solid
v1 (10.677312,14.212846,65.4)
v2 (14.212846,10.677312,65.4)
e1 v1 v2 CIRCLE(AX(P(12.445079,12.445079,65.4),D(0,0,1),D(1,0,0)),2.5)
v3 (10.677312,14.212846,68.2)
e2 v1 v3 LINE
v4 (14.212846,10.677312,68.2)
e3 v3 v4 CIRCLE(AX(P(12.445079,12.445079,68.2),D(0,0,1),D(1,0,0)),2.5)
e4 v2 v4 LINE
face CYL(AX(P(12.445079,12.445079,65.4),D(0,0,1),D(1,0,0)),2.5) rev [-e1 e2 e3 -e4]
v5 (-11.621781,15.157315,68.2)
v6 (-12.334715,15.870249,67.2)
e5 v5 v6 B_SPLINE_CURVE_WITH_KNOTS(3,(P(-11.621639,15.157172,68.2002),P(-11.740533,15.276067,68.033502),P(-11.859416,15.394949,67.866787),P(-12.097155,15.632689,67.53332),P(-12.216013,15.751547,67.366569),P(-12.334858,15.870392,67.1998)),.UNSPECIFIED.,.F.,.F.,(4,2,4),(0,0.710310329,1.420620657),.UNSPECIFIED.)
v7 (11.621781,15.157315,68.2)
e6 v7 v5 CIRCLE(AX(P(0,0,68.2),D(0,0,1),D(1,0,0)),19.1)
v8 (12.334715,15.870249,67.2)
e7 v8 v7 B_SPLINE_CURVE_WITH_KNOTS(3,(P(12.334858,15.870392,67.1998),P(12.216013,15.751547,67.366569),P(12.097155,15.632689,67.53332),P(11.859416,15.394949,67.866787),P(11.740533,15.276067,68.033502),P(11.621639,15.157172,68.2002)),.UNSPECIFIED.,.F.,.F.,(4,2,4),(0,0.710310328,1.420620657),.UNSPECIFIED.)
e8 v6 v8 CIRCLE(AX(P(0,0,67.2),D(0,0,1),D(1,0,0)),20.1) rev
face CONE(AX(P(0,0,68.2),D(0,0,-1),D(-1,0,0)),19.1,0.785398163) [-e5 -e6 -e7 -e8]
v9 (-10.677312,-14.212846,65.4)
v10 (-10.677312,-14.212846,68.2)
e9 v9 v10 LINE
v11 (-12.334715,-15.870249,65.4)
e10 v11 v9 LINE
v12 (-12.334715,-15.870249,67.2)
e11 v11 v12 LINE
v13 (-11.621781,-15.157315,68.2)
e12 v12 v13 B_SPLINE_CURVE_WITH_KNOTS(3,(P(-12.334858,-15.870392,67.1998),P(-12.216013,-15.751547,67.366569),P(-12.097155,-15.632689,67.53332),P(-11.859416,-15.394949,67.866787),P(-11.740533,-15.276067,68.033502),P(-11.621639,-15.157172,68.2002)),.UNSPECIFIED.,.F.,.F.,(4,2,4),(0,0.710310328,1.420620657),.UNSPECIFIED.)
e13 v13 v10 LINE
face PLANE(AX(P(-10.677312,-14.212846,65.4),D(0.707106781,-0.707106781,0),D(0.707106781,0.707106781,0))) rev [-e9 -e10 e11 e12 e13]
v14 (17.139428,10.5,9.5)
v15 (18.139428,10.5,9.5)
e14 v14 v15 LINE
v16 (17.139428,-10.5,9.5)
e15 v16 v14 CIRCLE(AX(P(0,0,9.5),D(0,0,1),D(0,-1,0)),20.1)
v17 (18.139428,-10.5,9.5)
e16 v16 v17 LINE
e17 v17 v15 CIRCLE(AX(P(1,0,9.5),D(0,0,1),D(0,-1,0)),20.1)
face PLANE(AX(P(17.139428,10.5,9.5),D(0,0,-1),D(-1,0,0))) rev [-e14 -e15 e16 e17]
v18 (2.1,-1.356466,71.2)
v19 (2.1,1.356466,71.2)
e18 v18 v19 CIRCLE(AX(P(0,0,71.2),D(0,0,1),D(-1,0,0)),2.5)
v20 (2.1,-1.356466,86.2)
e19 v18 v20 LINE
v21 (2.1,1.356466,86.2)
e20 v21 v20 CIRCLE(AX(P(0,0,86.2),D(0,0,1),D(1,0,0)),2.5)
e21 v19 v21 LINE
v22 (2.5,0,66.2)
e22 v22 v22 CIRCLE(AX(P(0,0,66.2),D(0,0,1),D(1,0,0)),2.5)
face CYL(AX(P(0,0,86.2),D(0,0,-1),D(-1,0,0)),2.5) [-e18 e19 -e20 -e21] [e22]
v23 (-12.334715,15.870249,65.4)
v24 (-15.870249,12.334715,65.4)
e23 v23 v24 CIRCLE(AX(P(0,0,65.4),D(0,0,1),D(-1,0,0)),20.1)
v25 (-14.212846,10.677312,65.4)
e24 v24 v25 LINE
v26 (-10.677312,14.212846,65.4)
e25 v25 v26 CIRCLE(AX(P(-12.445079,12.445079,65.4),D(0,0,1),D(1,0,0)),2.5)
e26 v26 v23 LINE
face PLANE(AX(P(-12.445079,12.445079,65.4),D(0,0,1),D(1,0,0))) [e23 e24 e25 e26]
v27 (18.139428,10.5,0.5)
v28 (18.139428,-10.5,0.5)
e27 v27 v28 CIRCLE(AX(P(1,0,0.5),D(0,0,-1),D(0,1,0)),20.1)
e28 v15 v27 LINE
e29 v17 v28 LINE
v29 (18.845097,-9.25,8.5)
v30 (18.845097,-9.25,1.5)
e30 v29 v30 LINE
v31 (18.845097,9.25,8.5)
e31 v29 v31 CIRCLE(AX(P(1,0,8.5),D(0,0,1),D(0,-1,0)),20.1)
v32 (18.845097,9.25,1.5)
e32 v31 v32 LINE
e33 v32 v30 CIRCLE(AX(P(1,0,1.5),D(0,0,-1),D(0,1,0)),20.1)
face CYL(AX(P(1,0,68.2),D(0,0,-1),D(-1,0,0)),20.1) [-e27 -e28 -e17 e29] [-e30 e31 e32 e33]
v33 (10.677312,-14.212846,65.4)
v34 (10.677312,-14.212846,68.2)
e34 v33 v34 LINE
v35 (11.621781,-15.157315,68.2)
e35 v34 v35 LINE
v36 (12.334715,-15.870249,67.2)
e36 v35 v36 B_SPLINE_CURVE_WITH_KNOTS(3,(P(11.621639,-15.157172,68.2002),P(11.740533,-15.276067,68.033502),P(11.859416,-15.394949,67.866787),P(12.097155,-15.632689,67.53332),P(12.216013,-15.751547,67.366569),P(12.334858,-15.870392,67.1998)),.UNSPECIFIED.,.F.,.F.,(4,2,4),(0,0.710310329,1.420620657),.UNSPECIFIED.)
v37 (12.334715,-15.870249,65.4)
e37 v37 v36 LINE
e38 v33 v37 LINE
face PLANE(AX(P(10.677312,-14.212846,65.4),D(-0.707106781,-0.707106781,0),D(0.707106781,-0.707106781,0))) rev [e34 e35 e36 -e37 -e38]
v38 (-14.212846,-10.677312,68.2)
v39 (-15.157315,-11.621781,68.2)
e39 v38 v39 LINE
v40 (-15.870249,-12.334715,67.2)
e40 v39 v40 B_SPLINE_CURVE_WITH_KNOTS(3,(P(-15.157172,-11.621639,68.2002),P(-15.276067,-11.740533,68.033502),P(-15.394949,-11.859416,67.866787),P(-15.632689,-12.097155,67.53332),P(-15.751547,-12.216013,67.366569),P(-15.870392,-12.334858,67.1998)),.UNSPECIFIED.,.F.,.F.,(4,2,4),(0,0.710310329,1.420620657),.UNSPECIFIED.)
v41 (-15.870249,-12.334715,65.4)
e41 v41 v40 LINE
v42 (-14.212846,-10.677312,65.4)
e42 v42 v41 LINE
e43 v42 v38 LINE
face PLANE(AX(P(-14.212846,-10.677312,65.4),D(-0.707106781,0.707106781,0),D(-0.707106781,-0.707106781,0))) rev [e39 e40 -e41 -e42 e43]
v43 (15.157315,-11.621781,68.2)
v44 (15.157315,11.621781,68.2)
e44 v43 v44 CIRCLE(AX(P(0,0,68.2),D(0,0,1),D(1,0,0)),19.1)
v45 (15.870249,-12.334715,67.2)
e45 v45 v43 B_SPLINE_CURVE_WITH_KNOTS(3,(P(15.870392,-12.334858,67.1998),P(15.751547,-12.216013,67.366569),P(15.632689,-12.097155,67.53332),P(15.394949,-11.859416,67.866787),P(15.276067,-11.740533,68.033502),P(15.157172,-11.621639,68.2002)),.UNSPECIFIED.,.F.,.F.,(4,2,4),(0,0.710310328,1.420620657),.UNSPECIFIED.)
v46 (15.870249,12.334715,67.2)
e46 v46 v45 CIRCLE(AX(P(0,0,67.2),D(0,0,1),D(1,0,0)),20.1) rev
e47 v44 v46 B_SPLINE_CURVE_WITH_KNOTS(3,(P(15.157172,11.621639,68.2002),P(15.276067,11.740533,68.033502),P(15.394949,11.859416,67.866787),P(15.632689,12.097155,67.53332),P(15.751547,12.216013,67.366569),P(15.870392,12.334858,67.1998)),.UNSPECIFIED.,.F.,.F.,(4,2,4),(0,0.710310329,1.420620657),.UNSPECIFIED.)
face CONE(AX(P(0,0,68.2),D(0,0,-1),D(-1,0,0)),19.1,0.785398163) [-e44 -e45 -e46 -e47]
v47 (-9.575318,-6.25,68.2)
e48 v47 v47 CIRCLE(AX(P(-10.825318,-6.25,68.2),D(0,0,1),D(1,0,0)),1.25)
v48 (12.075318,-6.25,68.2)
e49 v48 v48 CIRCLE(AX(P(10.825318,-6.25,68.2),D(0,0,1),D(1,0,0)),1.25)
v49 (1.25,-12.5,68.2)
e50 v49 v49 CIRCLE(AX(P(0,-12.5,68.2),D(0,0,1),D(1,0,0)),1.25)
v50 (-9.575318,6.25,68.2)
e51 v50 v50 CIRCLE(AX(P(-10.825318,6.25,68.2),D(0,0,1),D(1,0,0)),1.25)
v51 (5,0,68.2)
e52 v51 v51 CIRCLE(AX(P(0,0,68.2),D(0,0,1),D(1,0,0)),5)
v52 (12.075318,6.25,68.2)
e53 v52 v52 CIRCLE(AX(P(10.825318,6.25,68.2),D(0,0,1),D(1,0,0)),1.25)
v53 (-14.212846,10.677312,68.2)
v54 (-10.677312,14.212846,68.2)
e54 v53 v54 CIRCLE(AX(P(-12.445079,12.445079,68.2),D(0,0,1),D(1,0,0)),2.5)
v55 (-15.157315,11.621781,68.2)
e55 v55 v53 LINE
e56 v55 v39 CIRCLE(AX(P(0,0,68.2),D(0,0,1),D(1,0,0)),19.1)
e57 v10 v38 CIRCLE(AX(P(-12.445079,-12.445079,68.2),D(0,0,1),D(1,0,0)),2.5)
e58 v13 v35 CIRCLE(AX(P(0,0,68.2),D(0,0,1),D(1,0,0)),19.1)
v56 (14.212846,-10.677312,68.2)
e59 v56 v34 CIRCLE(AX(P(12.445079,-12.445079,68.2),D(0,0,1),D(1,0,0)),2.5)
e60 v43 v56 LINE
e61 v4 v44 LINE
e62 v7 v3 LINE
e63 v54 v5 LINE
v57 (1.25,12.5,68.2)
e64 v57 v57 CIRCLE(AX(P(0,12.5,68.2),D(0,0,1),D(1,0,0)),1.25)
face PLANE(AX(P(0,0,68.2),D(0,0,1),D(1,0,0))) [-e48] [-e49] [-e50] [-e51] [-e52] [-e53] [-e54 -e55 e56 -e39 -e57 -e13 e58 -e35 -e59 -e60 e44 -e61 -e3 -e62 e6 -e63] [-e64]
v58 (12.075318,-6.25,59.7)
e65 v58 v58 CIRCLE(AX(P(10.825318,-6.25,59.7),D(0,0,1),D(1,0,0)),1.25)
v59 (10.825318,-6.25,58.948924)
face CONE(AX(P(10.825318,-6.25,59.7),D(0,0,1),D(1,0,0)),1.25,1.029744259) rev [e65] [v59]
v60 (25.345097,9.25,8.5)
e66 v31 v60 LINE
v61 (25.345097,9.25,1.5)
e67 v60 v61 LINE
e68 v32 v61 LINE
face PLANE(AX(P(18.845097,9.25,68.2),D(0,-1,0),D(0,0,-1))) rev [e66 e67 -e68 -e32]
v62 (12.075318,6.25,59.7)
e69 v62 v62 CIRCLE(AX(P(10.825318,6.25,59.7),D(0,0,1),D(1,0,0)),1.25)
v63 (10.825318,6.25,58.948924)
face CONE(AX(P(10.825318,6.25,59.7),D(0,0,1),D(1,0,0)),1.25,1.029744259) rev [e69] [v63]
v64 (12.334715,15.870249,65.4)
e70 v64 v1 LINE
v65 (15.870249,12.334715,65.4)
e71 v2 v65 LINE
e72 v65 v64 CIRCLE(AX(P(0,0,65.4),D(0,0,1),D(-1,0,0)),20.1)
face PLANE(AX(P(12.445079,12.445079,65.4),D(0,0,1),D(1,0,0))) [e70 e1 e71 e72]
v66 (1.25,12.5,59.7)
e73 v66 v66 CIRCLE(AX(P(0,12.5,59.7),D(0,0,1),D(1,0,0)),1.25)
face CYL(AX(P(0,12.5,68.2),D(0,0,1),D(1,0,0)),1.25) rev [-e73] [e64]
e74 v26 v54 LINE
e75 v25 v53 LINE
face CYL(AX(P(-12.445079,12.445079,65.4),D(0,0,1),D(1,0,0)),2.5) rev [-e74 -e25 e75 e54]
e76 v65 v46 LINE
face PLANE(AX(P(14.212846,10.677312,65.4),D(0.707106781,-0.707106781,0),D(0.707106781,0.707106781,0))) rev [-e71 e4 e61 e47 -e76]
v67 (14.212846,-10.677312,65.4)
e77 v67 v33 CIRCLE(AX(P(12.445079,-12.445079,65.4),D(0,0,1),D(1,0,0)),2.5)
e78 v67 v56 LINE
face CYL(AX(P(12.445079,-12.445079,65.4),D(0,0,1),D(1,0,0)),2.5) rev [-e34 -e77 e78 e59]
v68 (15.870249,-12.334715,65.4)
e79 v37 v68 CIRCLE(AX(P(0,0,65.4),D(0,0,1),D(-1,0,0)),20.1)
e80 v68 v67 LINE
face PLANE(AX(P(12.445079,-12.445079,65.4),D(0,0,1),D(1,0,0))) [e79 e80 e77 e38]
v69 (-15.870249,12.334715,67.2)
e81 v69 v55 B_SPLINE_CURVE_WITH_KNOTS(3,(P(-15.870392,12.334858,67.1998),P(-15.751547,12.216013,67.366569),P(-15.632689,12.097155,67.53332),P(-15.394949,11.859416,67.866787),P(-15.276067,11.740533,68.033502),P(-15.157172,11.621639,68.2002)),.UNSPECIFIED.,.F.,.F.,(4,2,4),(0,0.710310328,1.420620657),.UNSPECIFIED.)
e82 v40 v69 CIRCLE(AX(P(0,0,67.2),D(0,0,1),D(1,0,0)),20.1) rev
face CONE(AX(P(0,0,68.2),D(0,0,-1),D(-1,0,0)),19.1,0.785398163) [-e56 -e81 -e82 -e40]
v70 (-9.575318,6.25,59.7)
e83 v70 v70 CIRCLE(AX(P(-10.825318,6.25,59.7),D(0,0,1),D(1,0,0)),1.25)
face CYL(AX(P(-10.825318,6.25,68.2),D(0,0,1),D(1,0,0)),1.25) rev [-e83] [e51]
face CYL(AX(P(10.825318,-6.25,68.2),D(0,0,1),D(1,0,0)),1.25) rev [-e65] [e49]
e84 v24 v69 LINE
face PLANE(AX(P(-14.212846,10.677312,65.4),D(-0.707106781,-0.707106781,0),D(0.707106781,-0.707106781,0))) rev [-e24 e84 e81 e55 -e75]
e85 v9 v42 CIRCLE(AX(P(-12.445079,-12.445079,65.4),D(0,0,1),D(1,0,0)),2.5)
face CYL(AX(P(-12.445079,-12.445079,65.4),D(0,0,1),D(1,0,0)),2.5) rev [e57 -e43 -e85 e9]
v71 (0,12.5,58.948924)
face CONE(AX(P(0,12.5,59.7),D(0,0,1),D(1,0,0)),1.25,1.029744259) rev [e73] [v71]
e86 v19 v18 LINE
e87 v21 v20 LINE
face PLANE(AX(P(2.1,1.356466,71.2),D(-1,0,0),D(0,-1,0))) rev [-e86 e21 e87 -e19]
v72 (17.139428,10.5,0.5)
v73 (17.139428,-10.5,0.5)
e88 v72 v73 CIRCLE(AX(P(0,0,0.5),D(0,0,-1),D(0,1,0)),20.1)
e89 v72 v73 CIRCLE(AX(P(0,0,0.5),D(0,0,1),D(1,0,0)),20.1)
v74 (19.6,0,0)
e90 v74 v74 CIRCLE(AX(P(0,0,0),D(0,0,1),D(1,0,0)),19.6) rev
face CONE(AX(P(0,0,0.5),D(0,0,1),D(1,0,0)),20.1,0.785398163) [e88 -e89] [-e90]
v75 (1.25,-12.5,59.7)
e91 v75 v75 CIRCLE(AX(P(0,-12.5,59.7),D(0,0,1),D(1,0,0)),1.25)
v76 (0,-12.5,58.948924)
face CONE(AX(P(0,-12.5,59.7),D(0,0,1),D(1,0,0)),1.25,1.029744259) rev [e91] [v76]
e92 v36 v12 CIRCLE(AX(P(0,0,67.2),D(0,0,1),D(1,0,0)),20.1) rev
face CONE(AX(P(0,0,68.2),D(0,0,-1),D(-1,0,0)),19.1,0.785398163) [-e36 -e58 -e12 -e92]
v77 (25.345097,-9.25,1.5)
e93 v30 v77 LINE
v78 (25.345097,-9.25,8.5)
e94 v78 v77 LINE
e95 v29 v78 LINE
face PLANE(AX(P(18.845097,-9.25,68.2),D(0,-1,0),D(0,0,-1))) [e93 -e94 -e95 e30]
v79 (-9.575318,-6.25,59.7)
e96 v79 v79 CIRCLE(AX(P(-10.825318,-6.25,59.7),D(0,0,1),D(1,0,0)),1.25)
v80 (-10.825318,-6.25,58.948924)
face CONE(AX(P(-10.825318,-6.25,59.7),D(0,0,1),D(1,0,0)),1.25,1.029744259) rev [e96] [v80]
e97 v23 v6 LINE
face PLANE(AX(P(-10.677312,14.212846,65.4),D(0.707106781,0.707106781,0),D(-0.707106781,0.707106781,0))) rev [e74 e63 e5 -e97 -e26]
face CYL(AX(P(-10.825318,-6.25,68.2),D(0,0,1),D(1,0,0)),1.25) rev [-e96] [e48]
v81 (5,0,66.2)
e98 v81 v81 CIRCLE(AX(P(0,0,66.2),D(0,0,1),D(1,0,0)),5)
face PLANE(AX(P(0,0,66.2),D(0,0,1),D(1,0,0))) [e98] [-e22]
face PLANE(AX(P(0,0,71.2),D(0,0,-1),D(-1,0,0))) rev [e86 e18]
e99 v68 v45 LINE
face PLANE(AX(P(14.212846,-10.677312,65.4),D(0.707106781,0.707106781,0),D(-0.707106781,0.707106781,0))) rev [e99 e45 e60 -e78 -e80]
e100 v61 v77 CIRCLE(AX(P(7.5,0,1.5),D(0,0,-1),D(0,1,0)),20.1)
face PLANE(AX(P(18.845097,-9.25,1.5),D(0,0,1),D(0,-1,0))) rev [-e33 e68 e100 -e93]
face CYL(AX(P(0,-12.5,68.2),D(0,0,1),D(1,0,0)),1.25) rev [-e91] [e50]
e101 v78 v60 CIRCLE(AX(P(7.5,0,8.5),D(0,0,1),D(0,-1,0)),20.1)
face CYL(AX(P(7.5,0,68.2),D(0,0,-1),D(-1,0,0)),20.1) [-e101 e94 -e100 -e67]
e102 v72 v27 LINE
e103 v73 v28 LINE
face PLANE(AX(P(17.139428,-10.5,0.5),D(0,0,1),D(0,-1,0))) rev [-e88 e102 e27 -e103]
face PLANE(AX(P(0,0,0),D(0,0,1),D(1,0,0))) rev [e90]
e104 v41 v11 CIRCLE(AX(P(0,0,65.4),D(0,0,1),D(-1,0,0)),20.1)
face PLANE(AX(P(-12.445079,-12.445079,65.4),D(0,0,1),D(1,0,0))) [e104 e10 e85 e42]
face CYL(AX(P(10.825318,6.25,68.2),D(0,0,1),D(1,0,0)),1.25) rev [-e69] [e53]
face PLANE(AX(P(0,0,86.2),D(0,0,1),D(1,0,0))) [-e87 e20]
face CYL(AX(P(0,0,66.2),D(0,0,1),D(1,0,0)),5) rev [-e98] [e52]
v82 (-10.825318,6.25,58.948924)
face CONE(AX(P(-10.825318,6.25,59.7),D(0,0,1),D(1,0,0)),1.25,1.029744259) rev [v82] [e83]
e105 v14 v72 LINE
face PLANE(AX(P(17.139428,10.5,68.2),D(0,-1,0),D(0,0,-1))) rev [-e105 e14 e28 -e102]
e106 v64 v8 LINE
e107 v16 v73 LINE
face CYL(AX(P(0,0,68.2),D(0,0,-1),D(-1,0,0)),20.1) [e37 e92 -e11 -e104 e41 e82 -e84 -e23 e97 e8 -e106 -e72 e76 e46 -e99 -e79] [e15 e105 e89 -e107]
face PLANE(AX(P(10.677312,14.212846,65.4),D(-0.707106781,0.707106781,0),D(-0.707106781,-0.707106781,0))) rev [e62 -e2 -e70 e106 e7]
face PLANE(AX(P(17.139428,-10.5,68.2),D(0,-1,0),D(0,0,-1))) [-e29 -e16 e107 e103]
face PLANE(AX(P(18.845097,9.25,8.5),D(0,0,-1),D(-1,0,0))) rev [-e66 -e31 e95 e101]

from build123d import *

# Parameters (mm, degrees)
SKETCH_1_R             = 20.1
EXTRUDE_1_DEPTH        = 68.2
SKETCH_2_R             = 5
CUT_EXTRUDE_1_DEPTH    = 2
SKETCH_3_R             = 2.5
EXTRUDE_2_DEPTH        = 20
CUT_EXTRUDE_START      = -15
CUT_EXTRUDE_2_DEPTH    = 15
CHAMFER_1_SIZE         = 1
M3X0_51_D              = 2.5
M3X0_51_DEPTH          = 8.5
M3X0_51_TIP            = 0.751075774
CUT_EXTRUDE_START_2    = -2.8
CUT_EXTRUDE_3_DEPTH    = 2.8
CHAMFER_2_SIZE         = 0.5
EXTRUDE_5_REACH        = 104.708
EXTRUDE_5_START_RADIUS = 20.1
EXTRUDE_5_END_RADIUS   = 20.1
SKETCH_9_W             = 9
SKETCH_9_H             = 21
EXTRUDE_6_REACH        = 110.208
EXTRUDE_6_START_RADIUS = 20.1
EXTRUDE_6_END_RADIUS   = 20.1
SKETCH_10_W            = 7
SKETCH_10_H            = 18.5


with BuildPart() as part:
    # Эскиз1 → Бобышка-Вытянуть1 (new body)
    with BuildSketch(Plane.XY):
        Circle(SKETCH_1_R)
    extrude(amount=EXTRUDE_1_DEPTH)

    # Эскиз2 → Вырез-Вытянуть1 (cut)
    with BuildSketch(Plane.XY.offset(68.2)):
        Circle(SKETCH_2_R)
    extrude(amount=-CUT_EXTRUDE_1_DEPTH, mode=Mode.SUBTRACT)

    # Эскиз3 → Бобышка-Вытянуть2 (add)
    with BuildSketch(Plane.XY.offset(66.2)):
        Circle(SKETCH_3_R)
    extrude(amount=EXTRUDE_2_DEPTH)

    # Эскиз4 → Вырез-Вытянуть2 (cut)
    with BuildSketch(Plane.XY.offset(86.2).offset(CUT_EXTRUDE_START)):
        with BuildLine():
            Line((2.1, 1.356465997), (2.1, -1.356465997))
            ThreePointArc((2.1, -1.356465997), (2.5, 0), (2.1, 1.356465997))
        make_face()
    extrude(amount=CUT_EXTRUDE_2_DEPTH, mode=Mode.SUBTRACT)

    # Фаска1
    chamfer_1_edges = [part.edges().sort_by_distance(p)[0] for p in [
        (-20.1, 0, 68.2),
    ]]
    chamfer(chamfer_1_edges, length=CHAMFER_1_SIZE)

    # Отверстие обработанное метчиком M3x0.51
    with Locations(Plane.XY.offset(68.2)):
        with Locations((-10.825317547, 6.25), (0, 12.5), (10.825317547, 6.25), (10.825317547, -6.25), (0, -12.5), (-10.825317547, -6.25)):
            Hole(M3X0_51_D / 2, depth=M3X0_51_DEPTH)
            with Locations((0, 0, -(M3X0_51_DEPTH + M3X0_51_TIP / 2))):  # 118° drill point
                Cone(0, M3X0_51_D / 2, M3X0_51_TIP, mode=Mode.SUBTRACT)

    # Эскиз8 → Вырез-Вытянуть3 (cut)
    with BuildSketch(Plane.XY.offset(68.2).offset(CUT_EXTRUDE_START_2)):
        with BuildLine():
            Line((-14.212846302, 10.677312396), (-15.870249004, 12.334715098))
            ThreePointArc((-15.870249004, 12.334715098), (-14.212846302, 14.212846302), (-12.334715098, 15.870249004))
            Line((-12.334715098, 15.870249004), (-10.677312396, 14.212846302))
            ThreePointArc((-10.677312396, 14.212846302), (-10.677312396, 10.677312396), (-14.212846302, 10.677312396))
        make_face()
        with BuildLine():
            Line((14.212846302, 10.677312396), (15.870249004, 12.334715098))
            ThreePointArc((15.870249004, 12.334715098), (14.212846302, 14.212846302), (12.334715098, 15.870249004))
            Line((12.334715098, 15.870249004), (10.677312396, 14.212846302))
            ThreePointArc((10.677312396, 14.212846302), (10.677312396, 10.677312396), (14.212846302, 10.677312396))
        make_face()
        with BuildLine():
            Line((10.677312396, -14.212846302), (12.334715098, -15.870249004))
            ThreePointArc((12.334715098, -15.870249004), (14.212846302, -14.212846302), (15.870249004, -12.334715098))
            Line((15.870249004, -12.334715098), (14.212846302, -10.677312396))
            ThreePointArc((14.212846302, -10.677312396), (10.677312396, -10.677312396), (10.677312396, -14.212846302))
        make_face()
        with BuildLine():
            Line((-14.212846302, -10.677312396), (-15.870249004, -12.334715098))
            ThreePointArc((-15.870249004, -12.334715098), (-14.212846302, -14.212846302), (-12.334715098, -15.870249004))
            Line((-12.334715098, -15.870249004), (-10.677312396, -14.212846302))
            ThreePointArc((-10.677312396, -14.212846302), (-10.677312396, -10.677312396), (-14.212846302, -10.677312396))
        make_face()
    extrude(amount=CUT_EXTRUDE_3_DEPTH, mode=Mode.SUBTRACT)

    # Фаска2
    chamfer_2_edges = [part.edges().sort_by_distance(p)[0] for p in [
        (-20.1, 0, 0),
    ]]
    chamfer(chamfer_2_edges, length=CHAMFER_2_SIZE)

    # Бобышка-Вытянуть5: from a cylinder face, 104.708 long prism both ways, kept between that surface and its translate by the depth
    extrude_5_start = Plane(origin=(0, 0, 5), z_dir=(0, 0, -1)) * Cylinder(EXTRUDE_5_START_RADIUS, 250.616, mode=Mode.PRIVATE)
    extrude_5_end = Plane(origin=(1, 0, 5), z_dir=(0, 0, -1)) * Cylinder(EXTRUDE_5_END_RADIUS, 250.616, mode=Mode.PRIVATE)
    # Эскиз9 → Бобышка-Вытянуть5 (add, from a surface)
    with BuildSketch(Plane(origin=(30, 0, 0), x_dir=(0, 0, -1), z_dir=(1, 0, 0)), mode=Mode.PRIVATE) as extrude_5_sk1:
        with Locations((-5, 0)):
            Rectangle(SKETCH_9_W, SKETCH_9_H)
    extrude_5_tool1 = extrude(extrude_5_sk1.sketch, amount=EXTRUDE_5_REACH, both=True, mode=Mode.PRIVATE)
    add(((extrude_5_tool1 - extrude_5_start) & extrude_5_end).solids().sort_by_distance((20.1, 0, 0.5))[0])

    # Бобышка-Вытянуть6: from a cylinder face, 110.208 long prism both ways, kept between that surface and its translate by the depth
    extrude_6_start = Plane(origin=(1, 0, 5), z_dir=(0, 0, -1)) * Cylinder(EXTRUDE_6_START_RADIUS, 261.616, mode=Mode.PRIVATE)
    extrude_6_end = Plane(origin=(7.5, 0, 5), z_dir=(0, 0, -1)) * Cylinder(EXTRUDE_6_END_RADIUS, 261.616, mode=Mode.PRIVATE)
    # Эскиз10 → Бобышка-Вытянуть6 (add, from a surface)
    with BuildSketch(Plane(origin=(30, 0, 0), x_dir=(0, 0, -1), z_dir=(1, 0, 0)), mode=Mode.PRIVATE) as extrude_6_sk1:
        with Locations((-5, 0)):
            Rectangle(SKETCH_10_W, SKETCH_10_H)
    extrude_6_tool1 = extrude(extrude_6_sk1.sketch, amount=EXTRUDE_6_REACH, both=True, mode=Mode.PRIVATE)
    add(((extrude_6_tool1 - extrude_6_start) & extrude_6_end).solids().sort_by_distance((19.619714, 0, 5))[0])


solid = part.part
